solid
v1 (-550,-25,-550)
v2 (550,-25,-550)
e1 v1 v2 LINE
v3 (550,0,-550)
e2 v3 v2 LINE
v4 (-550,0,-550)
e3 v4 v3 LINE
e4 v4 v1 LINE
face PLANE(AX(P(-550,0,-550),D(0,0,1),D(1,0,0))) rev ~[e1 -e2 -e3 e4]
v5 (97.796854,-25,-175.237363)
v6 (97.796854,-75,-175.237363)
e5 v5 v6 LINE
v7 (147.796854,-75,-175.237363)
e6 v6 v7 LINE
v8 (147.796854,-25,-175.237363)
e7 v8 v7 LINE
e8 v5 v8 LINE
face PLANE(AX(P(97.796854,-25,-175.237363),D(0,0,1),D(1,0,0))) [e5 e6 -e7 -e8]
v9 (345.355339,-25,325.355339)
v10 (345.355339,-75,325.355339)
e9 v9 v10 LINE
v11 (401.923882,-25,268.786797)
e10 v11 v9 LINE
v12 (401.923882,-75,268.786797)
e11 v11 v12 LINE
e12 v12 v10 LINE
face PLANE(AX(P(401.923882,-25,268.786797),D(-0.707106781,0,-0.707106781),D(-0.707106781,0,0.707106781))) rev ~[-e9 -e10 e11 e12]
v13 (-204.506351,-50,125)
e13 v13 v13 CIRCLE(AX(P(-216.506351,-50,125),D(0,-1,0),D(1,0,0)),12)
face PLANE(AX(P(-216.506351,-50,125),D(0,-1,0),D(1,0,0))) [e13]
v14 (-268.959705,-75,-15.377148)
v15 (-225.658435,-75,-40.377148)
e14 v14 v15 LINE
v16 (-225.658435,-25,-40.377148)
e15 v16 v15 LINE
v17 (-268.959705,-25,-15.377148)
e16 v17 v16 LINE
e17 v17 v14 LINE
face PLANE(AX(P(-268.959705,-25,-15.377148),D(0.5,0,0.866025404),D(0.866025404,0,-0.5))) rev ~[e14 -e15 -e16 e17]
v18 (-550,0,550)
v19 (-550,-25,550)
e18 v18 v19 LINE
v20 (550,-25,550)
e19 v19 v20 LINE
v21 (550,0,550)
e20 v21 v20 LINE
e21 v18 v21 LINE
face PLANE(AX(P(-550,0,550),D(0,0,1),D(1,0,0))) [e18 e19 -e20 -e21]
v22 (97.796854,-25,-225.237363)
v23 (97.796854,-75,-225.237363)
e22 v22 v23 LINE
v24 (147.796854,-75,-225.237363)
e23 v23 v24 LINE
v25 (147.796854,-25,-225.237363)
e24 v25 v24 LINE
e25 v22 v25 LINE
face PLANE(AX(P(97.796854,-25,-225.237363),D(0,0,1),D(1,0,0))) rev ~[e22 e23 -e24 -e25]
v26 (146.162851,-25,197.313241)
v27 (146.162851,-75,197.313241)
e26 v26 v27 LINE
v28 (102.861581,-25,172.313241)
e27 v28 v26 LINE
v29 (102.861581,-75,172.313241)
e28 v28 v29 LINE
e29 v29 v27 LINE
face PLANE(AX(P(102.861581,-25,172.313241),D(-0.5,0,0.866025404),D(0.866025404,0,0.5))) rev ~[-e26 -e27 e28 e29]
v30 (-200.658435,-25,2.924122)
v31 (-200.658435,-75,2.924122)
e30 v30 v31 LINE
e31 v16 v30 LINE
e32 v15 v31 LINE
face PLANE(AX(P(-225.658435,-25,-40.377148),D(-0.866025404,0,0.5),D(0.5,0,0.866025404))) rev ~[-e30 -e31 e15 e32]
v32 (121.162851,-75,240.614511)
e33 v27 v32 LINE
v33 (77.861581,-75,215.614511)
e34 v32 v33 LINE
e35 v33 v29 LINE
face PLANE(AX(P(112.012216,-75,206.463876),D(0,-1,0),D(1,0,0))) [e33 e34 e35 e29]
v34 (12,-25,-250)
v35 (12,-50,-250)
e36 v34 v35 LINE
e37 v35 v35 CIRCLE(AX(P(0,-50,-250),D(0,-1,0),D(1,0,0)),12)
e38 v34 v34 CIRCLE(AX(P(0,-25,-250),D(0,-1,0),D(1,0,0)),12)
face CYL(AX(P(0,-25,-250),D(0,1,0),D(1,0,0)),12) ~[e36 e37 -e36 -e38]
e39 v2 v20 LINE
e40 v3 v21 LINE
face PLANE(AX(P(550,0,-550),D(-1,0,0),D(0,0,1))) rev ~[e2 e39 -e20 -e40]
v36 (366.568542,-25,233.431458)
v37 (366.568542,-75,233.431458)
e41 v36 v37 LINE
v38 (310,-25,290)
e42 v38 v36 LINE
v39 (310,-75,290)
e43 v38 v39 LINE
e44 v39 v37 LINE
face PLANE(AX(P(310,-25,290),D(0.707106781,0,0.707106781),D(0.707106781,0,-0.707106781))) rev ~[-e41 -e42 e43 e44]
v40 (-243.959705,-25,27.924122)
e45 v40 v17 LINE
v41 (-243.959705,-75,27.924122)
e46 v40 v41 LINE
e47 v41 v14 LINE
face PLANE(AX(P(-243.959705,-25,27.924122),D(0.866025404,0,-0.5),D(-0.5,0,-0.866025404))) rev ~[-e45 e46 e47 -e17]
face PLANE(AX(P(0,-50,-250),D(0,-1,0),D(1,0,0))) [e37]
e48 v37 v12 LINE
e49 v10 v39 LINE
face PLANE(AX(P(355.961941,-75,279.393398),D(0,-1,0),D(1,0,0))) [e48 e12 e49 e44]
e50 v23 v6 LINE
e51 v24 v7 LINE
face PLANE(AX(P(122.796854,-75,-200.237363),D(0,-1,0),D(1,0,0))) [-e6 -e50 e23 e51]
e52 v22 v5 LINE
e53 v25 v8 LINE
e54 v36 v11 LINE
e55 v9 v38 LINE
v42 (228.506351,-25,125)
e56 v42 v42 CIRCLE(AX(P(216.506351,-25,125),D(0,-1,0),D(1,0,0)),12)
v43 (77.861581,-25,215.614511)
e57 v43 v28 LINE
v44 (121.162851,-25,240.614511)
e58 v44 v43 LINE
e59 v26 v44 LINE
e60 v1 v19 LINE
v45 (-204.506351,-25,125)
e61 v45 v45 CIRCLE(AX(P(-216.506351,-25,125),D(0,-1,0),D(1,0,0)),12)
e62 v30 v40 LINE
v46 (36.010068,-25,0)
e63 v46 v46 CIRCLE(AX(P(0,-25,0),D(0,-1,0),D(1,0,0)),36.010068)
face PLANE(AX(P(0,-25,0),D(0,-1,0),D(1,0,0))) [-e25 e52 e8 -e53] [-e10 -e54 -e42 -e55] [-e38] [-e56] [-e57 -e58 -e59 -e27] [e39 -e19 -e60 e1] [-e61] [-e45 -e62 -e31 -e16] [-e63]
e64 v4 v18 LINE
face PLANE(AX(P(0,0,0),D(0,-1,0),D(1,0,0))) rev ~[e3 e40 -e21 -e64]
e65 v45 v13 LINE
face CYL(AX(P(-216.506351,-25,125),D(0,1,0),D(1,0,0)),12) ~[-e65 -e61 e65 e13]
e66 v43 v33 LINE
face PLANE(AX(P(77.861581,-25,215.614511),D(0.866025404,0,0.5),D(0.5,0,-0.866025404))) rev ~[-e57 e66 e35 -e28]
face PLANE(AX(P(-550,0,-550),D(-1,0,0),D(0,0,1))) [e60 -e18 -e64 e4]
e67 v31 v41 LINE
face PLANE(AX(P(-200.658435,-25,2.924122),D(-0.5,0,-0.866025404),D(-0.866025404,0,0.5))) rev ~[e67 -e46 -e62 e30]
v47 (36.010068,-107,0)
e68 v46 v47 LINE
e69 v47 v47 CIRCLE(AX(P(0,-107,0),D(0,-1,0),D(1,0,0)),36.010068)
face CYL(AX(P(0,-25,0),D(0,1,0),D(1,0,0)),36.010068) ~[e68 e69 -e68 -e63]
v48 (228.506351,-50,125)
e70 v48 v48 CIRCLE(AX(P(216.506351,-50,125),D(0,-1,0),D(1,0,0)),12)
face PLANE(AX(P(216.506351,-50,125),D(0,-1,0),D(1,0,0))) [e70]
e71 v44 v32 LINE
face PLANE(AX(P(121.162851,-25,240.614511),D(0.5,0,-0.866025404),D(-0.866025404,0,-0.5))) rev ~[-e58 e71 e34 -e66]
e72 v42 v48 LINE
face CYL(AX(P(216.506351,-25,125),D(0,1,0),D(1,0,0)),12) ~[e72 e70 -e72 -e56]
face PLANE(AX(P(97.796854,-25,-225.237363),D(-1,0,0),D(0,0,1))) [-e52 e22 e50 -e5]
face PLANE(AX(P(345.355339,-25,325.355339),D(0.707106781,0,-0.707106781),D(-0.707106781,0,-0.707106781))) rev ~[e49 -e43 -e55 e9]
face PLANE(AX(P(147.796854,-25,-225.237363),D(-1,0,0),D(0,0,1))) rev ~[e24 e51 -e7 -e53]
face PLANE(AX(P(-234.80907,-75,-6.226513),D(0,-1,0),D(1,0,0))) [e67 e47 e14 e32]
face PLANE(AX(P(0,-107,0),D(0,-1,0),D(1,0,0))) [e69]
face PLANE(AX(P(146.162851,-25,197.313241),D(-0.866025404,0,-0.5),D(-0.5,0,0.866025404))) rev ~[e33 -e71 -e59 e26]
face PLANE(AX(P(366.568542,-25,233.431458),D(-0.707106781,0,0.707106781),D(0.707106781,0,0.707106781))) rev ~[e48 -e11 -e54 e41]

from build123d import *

# Parameters (mm, degrees)
F0_W      = 1100
F0_H      = 1100
F1_DEPTH  = 25
F2_R      = 36.0100678946
F3_DEPTH  = 82
F4_R      = 12
F5_DEPTH  = 25
F6_DEPTH  = 25
F7_W      = 50
F7_H      = 50
F8_DEPTH  = 50
F10_DEPTH = 50


# Not quite as in the source:
# - a feature names something its author has since deleted; it is built from what else it names


with BuildPart() as f1:
    # F0 (on Front) → F1 (new body)
    with BuildSketch(Plane.XZ):
        Rectangle(F0_W, F0_H)
    extrude(amount=F1_DEPTH)

    # F2 (on face) → F3 (join)
    with BuildSketch(Plane.XZ.offset(25)):
        Circle(F2_R)
    extrude(amount=F3_DEPTH)

    # F4 (on face) → F5 (join)
    with BuildSketch(Plane.XZ.offset(25)):
        with Locations((0, -250)):
            Circle(F4_R)
    extrude(amount=F5_DEPTH)

    # F4 (on face) → F6 (join)
    with BuildSketch(Plane.XZ.offset(25)):
        with Locations((-216.5063509461, 125)):
            Circle(F4_R)
        with Locations((216.5063509461, 125)):
            Circle(F4_R)
    extrude(amount=F6_DEPTH)

    # F7 (on face) → F8 (join)
    with BuildSketch(Plane.XZ.offset(25)):
        Polygon((121.1628514659, 240.6145112228), (77.8615812767, 215.6145112228), (102.8615812767, 172.3132410336), (146.1628514659, 197.3132410336), align=None)
        with Locations((122.7968535052, -200.2373629758)):
            Rectangle(F7_W, F7_H)
        Polygon((-268.9597049711, -15.377148247), (-225.6584347818, -40.377148247), (-200.6584347818, 2.9241219422), (-243.9597049711, 27.9241219422), align=None)
    extrude(amount=F8_DEPTH)

    # F9 (on face) → F10 (join)
    with BuildSketch(Plane.XZ.offset(25)):
        Polygon((345.3553390593, 325.3553390593), (310, 290), (366.5685424949, 233.4314575051), (401.9238815543, 268.7867965644), align=None)
    extrude(amount=F10_DEPTH)


solid = f1.part
